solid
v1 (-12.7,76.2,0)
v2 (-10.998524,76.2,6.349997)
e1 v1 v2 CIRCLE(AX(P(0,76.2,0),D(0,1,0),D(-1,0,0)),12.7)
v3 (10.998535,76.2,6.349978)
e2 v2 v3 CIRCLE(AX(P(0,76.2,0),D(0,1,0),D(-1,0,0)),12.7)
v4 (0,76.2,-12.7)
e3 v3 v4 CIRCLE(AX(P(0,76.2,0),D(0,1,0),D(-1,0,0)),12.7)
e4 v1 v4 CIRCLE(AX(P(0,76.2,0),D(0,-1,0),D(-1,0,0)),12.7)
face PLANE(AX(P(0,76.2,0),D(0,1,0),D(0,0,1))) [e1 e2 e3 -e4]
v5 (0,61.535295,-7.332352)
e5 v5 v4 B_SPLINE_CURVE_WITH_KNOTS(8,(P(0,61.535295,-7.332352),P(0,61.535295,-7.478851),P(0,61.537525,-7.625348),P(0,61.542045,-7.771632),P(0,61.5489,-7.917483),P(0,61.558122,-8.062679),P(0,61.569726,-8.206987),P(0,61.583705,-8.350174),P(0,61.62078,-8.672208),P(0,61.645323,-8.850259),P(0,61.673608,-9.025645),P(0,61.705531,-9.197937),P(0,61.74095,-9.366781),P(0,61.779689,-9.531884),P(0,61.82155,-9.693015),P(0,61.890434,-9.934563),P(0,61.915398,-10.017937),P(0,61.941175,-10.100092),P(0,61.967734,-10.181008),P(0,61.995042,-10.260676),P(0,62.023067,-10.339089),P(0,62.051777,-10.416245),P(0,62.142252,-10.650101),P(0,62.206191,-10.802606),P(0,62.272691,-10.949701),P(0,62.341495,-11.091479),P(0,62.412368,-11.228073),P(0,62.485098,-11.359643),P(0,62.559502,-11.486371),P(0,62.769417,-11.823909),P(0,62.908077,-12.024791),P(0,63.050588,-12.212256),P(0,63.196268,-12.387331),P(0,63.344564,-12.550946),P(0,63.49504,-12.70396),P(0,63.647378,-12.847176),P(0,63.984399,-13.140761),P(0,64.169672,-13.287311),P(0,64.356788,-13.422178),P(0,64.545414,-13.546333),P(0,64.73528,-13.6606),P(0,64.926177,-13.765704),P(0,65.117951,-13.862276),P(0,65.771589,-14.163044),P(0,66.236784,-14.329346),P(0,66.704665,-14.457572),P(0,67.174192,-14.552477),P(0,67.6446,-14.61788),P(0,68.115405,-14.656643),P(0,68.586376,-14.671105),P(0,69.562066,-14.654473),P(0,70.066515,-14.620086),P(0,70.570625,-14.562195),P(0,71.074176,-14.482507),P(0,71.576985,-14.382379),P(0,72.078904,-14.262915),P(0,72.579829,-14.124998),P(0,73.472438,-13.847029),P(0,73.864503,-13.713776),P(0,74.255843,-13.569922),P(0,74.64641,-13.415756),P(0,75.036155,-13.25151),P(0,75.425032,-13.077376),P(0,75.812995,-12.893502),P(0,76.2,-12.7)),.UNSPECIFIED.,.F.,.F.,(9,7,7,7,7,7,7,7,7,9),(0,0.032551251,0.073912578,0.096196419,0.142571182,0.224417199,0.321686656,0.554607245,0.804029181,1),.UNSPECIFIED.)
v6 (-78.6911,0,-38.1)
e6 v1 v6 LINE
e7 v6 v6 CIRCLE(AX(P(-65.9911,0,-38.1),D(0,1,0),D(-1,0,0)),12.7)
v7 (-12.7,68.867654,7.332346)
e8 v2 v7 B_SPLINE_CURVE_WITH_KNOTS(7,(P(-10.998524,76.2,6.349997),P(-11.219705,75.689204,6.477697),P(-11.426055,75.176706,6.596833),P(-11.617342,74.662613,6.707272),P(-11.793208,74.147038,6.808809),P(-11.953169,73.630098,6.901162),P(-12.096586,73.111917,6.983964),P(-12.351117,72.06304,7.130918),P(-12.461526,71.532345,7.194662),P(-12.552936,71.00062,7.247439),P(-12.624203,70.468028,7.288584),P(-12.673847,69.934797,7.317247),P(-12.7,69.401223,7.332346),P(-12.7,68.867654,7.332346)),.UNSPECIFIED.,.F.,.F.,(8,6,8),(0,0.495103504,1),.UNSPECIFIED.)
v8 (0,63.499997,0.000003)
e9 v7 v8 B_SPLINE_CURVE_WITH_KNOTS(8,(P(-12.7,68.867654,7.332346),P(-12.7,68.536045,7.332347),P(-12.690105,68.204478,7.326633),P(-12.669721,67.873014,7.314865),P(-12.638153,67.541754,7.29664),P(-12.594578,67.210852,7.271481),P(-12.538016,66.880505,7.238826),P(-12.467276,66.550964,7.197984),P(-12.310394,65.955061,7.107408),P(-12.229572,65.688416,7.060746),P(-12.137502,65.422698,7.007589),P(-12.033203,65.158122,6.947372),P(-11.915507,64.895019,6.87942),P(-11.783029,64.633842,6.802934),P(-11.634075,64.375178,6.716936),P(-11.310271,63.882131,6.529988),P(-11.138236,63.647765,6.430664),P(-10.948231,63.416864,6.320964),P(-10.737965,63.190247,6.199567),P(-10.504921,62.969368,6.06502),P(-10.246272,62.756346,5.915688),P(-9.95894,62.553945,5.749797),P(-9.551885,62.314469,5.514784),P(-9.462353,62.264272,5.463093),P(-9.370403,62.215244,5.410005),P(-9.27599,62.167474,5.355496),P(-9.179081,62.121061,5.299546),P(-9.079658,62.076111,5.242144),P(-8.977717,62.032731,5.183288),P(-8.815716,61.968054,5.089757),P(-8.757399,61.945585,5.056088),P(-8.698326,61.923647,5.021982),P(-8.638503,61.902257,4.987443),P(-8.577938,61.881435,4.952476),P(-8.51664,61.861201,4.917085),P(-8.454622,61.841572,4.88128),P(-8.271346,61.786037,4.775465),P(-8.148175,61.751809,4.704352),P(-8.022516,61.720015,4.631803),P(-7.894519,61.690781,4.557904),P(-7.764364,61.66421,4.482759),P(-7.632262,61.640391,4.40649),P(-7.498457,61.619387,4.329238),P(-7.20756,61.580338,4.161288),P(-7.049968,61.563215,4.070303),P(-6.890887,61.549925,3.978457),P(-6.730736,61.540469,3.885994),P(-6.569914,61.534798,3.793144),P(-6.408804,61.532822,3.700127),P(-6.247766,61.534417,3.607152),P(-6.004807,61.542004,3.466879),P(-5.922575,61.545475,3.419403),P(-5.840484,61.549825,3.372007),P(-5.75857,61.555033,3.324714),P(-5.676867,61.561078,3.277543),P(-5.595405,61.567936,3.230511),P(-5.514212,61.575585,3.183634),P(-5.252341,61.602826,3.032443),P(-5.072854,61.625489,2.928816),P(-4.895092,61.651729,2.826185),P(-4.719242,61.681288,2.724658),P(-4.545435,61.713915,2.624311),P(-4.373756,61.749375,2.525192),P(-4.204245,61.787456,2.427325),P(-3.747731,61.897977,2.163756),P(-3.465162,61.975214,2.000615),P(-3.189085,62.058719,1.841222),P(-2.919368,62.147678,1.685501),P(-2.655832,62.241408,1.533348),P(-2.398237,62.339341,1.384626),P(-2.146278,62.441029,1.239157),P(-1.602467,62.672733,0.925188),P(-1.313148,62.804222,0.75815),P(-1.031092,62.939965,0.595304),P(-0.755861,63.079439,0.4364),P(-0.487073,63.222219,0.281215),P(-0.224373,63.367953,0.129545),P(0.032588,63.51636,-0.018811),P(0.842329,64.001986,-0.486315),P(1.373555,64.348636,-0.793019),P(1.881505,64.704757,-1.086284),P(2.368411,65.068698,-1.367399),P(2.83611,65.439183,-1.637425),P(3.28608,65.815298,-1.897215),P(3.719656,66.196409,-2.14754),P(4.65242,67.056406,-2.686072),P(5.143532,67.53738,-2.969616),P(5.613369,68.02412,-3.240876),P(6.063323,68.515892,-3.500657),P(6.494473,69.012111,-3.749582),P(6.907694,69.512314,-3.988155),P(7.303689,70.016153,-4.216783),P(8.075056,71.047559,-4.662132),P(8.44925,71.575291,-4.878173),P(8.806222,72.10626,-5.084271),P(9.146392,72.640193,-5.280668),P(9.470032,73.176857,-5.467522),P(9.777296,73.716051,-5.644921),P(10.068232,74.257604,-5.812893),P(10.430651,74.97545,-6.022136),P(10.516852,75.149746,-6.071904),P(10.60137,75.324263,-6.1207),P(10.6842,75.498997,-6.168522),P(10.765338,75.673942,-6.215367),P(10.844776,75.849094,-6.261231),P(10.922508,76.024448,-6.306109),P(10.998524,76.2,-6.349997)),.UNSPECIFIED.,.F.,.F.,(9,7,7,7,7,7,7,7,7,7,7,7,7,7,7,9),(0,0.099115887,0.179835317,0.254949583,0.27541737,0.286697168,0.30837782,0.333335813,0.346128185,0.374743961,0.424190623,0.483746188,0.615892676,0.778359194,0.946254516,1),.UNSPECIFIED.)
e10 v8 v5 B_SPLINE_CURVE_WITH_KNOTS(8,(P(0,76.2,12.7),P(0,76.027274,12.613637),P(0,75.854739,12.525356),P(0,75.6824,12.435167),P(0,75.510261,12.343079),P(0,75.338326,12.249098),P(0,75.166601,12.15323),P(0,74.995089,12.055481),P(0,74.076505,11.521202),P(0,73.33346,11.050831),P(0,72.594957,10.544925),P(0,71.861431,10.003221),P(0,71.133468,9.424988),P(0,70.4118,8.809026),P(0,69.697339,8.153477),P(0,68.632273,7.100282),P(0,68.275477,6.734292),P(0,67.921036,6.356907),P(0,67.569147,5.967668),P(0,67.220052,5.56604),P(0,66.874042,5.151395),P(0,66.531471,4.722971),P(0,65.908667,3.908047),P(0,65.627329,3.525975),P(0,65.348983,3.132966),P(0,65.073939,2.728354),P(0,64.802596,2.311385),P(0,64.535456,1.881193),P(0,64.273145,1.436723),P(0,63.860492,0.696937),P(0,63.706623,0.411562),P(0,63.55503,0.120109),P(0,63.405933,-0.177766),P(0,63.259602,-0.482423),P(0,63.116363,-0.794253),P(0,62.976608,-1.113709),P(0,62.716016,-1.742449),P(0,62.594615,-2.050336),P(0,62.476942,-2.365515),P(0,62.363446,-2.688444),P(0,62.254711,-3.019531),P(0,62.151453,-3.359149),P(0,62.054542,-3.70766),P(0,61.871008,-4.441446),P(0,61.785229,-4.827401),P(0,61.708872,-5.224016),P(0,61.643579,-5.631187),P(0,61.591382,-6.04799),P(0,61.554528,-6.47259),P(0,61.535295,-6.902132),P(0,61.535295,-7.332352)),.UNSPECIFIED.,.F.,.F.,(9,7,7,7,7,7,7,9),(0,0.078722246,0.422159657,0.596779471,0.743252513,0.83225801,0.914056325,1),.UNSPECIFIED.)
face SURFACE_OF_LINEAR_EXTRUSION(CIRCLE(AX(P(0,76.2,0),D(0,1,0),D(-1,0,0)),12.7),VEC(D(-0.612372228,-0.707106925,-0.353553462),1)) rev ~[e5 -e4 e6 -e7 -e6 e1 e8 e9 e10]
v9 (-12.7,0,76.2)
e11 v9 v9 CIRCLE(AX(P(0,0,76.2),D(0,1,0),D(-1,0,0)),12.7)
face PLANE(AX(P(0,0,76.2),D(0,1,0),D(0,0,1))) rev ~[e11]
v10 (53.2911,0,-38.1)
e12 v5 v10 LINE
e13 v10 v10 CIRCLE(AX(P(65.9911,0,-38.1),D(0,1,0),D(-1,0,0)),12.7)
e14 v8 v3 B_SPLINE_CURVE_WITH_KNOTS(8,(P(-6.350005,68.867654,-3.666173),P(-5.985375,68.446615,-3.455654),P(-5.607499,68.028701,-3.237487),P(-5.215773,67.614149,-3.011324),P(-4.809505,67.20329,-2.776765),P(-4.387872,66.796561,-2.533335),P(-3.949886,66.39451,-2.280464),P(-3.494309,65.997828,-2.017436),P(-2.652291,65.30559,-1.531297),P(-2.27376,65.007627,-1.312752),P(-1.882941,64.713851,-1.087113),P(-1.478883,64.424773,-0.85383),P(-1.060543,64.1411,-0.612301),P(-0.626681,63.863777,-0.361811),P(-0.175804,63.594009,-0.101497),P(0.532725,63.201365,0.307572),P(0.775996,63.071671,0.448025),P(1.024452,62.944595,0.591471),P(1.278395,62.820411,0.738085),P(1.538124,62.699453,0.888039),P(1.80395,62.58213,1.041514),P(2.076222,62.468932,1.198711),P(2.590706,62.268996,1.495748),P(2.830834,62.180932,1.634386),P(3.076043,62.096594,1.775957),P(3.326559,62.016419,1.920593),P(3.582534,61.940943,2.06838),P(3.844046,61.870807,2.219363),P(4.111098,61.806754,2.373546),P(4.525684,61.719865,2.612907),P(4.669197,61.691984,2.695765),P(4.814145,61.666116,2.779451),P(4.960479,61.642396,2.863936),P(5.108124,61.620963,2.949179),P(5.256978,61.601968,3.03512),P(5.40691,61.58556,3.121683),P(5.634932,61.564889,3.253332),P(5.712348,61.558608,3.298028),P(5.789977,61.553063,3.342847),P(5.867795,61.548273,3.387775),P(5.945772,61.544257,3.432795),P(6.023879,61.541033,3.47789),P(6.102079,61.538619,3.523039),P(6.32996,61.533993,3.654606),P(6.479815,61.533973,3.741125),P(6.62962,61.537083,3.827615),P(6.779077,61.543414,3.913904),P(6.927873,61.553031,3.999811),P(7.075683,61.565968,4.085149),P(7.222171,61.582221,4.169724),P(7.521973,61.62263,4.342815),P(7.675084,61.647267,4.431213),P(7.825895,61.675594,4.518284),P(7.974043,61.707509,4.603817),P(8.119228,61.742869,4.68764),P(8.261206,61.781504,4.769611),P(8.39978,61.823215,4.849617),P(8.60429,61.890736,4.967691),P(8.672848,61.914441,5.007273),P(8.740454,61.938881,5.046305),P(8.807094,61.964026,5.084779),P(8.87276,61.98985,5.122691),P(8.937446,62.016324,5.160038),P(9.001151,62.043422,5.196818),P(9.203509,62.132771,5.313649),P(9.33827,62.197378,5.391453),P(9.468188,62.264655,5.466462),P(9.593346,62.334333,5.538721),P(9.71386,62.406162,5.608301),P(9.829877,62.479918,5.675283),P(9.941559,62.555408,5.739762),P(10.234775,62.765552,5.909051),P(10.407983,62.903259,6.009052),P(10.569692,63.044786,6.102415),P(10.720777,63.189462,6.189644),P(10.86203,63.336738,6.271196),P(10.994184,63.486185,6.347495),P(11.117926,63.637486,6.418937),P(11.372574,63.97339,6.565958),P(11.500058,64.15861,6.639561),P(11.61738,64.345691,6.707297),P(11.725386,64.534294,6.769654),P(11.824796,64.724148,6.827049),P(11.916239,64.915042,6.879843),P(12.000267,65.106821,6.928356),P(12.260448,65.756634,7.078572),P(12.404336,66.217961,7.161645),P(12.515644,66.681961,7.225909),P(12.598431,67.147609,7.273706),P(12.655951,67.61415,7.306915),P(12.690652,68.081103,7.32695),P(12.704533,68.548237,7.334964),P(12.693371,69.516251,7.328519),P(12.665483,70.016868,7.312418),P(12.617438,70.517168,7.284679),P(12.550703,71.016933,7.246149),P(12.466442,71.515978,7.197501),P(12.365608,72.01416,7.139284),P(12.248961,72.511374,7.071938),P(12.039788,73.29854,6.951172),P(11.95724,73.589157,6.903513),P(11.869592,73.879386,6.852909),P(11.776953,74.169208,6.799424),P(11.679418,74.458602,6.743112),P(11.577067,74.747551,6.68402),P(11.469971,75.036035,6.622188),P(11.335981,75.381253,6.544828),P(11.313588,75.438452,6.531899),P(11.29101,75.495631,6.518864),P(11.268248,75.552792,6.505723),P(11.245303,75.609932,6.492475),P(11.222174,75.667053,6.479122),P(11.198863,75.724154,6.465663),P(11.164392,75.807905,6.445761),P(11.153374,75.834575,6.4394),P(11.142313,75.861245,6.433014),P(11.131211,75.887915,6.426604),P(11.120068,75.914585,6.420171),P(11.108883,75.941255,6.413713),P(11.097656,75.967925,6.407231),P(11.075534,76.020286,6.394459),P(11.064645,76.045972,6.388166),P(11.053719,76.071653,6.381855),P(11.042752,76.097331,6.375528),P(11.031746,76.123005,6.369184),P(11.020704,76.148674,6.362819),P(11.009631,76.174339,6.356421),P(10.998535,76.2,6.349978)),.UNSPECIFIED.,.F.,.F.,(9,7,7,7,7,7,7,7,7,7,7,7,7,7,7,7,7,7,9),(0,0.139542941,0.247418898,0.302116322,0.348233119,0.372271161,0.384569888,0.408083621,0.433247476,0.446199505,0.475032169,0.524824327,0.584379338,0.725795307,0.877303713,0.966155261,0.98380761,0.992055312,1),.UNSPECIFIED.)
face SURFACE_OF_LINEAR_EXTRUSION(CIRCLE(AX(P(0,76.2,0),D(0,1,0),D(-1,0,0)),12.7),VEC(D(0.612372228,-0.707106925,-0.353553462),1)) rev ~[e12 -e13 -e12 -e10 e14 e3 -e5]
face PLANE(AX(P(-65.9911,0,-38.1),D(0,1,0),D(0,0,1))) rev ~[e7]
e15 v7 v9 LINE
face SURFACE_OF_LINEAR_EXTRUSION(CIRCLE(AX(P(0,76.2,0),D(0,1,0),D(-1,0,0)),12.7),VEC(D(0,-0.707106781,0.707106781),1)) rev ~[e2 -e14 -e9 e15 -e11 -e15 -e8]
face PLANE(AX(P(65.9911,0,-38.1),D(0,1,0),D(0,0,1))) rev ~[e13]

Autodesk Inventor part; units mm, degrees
ref_plane "YZ Plane" through (0, 0, 0) normal (1, 0, 0) x (0, 1, 0)
ref_plane "XY Plane" through (0, 0, 0) normal (0, 0, 1) x (1, 0, 0)
sketch "Sketch1" plane through (0, 0, 0) normal (0, 1, 0) x (-1, 0, 0)
  circle A0 centre (0, 0) radius 76.2 construction
  line L0 (0, 0) -> (0, 76.2) construction
  line L1 (0, 0) -> (65.9911, -38.1) construction
  line L2 (0, 0) -> (-65.9911, -38.1) construction
  dimension "d0" = 152.4
  dimension "d1" = 120
  dimension "d2" = 120
sketch "Sketch2" plane through (0, 0, 0) normal (1, 0, 0) x (0, 1, 0)
  line L0 (0, 0) -> (76.2, 0) construction
  dimension "d3" = 76.2
ref_plane "Work Plane1" through (0, 76.2, 0) normal (0, 1, 0) x (-1, 0, 0)
sketch "Sketch3" plane through (0, 76.2, 0) normal (0, 1, 0) x (-1, 0, 0)
  circle A0 centre (0, 0) radius 12.7
  dimension "d5" = 25.4
sketch3d "3D Sketch1"
  line L0 (0, 76.2, 0) -> (0, 0, 76.2)
sweep "Sweep2" add profiles "Sketch3" path "3D Sketch1"
sketch "Sketch4" plane through (0, 76.2, 0) normal (0, 1, 0) x (-1, 0, 0)
  circle A0 centre (0, 0) radius 12.7
sketch3d "3D Sketch2"
  line L0 (0, 76.2, 0) -> (65.9911, 0, -38.1)
sweep "Sweep3" add profiles "Sketch4" path "3D Sketch2"
sketch "Sketch5" plane through (0, 76.2, 0) normal (0, 1, 0) x (-1, 0, 0)
  circle A0 centre (0, 0) radius 12.7
sketch3d "3D Sketch3"
  line L0 (0, 76.2, 0) -> (-65.9911, 0, -38.1)
sweep "Sweep4" add profiles "Sketch5" path "3D Sketch3"
properties part number "CameraTripodBase"
